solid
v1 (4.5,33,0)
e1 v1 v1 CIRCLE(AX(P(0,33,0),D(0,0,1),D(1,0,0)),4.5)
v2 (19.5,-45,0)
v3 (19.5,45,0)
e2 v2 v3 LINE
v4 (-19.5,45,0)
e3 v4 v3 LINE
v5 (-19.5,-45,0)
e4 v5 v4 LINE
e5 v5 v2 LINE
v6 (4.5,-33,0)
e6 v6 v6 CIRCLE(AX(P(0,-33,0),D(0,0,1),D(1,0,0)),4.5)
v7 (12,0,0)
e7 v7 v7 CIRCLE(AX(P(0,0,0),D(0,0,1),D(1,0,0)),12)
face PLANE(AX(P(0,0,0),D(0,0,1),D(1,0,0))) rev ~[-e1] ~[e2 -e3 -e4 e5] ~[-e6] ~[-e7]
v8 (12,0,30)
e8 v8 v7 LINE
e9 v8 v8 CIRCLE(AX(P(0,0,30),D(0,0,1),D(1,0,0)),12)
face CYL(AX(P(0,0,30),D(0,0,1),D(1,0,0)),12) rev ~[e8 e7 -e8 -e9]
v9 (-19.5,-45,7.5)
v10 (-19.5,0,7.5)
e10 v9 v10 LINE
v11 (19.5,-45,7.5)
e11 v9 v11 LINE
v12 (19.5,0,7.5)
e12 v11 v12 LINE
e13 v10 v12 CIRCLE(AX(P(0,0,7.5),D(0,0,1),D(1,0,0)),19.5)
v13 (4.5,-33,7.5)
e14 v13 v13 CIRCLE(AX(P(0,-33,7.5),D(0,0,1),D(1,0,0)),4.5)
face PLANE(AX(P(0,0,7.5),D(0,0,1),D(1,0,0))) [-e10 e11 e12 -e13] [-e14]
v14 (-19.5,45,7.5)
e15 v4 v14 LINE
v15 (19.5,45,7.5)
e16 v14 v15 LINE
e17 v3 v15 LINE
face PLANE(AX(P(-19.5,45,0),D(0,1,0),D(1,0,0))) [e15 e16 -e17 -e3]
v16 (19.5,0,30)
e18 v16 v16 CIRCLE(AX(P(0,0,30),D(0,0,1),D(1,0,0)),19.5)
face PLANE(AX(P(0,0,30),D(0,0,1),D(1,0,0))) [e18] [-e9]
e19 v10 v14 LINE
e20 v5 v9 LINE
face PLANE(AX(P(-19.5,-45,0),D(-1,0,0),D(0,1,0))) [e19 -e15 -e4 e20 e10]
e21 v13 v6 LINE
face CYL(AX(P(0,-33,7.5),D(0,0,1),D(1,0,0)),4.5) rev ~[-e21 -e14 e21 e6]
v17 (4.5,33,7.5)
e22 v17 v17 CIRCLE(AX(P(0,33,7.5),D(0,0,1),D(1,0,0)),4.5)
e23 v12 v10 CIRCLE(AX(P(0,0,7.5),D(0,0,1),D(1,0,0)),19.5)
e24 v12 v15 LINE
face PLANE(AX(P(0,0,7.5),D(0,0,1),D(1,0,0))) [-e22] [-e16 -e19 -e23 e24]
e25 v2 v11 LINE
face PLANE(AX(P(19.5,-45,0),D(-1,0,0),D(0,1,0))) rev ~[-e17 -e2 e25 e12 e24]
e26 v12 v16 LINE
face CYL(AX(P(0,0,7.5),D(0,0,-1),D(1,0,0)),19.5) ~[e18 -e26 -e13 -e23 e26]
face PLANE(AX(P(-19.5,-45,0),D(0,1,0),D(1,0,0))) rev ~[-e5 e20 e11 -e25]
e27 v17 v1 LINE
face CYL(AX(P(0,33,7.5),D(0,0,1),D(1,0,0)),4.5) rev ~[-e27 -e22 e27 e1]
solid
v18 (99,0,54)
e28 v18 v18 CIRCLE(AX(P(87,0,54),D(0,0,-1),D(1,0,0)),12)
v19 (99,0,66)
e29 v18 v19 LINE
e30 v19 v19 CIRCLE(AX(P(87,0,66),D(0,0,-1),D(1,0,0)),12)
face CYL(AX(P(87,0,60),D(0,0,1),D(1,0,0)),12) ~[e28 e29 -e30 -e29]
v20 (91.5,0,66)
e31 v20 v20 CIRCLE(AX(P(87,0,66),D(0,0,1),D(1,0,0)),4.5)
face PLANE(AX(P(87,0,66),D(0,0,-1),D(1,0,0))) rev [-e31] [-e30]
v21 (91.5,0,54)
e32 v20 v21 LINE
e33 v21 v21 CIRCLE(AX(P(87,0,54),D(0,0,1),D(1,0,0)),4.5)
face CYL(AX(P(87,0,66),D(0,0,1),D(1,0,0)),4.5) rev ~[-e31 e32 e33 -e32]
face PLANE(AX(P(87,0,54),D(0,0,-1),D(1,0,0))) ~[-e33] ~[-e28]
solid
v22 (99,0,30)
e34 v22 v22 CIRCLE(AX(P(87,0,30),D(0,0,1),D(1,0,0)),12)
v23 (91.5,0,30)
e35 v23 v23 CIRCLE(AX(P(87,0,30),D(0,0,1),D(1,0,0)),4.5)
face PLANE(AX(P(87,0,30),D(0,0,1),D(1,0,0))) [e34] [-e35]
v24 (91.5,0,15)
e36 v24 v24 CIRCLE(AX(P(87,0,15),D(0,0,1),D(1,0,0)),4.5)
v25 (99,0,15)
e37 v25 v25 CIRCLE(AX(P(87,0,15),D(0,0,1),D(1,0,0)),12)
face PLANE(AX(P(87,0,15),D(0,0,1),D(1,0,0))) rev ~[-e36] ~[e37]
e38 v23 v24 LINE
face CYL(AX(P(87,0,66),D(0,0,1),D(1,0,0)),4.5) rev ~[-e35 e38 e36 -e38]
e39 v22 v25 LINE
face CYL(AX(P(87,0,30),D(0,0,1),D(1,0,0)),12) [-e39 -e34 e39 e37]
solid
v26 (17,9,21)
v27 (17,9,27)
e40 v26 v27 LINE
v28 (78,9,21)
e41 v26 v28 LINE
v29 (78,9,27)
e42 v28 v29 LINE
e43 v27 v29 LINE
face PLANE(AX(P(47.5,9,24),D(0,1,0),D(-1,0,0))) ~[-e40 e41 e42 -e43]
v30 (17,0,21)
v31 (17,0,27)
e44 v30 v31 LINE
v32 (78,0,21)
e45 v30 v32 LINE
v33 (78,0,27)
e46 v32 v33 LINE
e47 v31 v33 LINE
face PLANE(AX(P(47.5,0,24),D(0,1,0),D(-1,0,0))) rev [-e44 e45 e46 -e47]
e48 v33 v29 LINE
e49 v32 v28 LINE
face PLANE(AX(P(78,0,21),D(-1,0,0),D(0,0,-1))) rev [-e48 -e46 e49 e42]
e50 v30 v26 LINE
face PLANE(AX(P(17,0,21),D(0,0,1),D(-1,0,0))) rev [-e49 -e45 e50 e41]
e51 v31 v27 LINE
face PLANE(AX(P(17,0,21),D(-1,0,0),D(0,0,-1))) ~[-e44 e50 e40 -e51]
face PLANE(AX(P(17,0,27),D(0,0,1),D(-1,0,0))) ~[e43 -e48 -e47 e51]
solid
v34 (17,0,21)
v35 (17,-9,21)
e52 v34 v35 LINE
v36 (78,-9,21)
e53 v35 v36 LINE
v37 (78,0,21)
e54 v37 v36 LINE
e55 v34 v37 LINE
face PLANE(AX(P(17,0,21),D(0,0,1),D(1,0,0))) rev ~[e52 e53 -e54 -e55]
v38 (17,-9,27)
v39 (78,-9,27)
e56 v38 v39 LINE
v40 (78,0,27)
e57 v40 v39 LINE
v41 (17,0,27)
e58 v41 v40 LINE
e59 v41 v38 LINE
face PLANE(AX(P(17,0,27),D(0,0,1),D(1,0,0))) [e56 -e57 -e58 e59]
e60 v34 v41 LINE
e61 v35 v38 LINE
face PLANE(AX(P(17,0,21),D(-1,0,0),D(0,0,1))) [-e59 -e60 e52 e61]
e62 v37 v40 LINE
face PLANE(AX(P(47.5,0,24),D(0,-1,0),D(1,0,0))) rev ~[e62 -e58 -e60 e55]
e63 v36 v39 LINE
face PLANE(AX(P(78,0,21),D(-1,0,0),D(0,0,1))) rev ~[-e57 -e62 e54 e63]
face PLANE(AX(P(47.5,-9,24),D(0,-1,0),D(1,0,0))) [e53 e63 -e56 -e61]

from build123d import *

# Parameters (mm, degrees)
F0_W      = 39
F0_H      = 90
F1_DEPTH  = 7.5
F3_R      = 4.5
F4_DEPTH  = 7.5
F5_DEPTH  = 22.5
F6_R      = 12
F7_DEPTH  = 30
F8_R      = 12
F9_DEPTH  = 15
F10_W     = 12
F10_H     = 12
F12_R     = 4.5
F13_DEPTH = 51
F14_R     = 4.5
F15_DEPTH = 15
F16_W     = 61
F16_H     = 6
F17_DEPTH = 9


with BuildPart() as f1:
    # F0 (on Top) → F1 (new body)
    with BuildSketch(Plane.XY):
        Rectangle(F0_W, F0_H)
    extrude(amount=F1_DEPTH)

    # F3 (on face) → F4 (cut, through all)
    with BuildSketch(Plane.XY.offset(7.5)):
        with Locations((0, -33)):
            Circle(F3_R)
        with Locations((0, 33)):
            Circle(F3_R)
    extrude(amount=-F4_DEPTH, mode=Mode.SUBTRACT)

    # F2 (on face) → F5 (join)
    with BuildSketch(Plane.XY.offset(7.5)):
        with BuildLine():
            ThreePointArc((-19.5, -2.3e-08), (1.15e-08, -19.5), (19.5, 0))
            ThreePointArc((19.5, 0), (-1.15e-08, 19.5), (-19.5, -2.3e-08))
        make_face()
    extrude(amount=F5_DEPTH)

    # F6 (on face) → F7 (cut, through all)
    with BuildSketch(Plane.XY.offset(30)):
        Circle(F6_R)
    extrude(amount=-F7_DEPTH, mode=Mode.SUBTRACT)

    # F14 (on face) → F15 (cut, through all)
    with BuildSketch(Plane.XY.offset(30)):
        with Locations((87, 0)):
            Circle(F14_R)
    extrude(amount=-F15_DEPTH, mode=Mode.SUBTRACT)


with BuildPart() as f9:
    # F8 (on face) → F9 (new body)
    with BuildSketch(Plane.XY.offset(30)):
        with Locations((87, 0)):
            Circle(F8_R)
    extrude(amount=-F9_DEPTH)


with BuildPart() as f11:
    # F10 (on Front) → F11 (revolve)
    with BuildSketch(Plane.XZ):
        with Locations((93, 60)):
            Rectangle(F10_W, F10_H)
    revolve(axis=Axis((87, 0, 60), (0, 0, -1)))


with BuildPart() as f13_tool:
    # F12 (on face) → F13 (new body, through all)
    with BuildSketch(Plane.XY.offset(66)):
        with Locations((87, 0)):
            Circle(F12_R)
    extrude(amount=-F13_DEPTH)


with BuildPart() as f9_1:
    add(f9.part)

    # F13: cut by f13_tool
    add(f13_tool.part, mode=Mode.SUBTRACT)


with BuildPart() as f11_1:
    add(f11.part)

    # F13: cut by f13_tool
    add(f13_tool.part, mode=Mode.SUBTRACT)


with BuildPart() as f17:
    # F16 (on Front) → F17 (new body)
    with BuildSketch(Plane.XZ):
        with Locations((47.5, 24)):
            Rectangle(F16_W, F16_H)
    extrude(amount=F17_DEPTH)


with BuildPart() as f18_1:
    # F18: instance of F17
    add(f17.part.mirror(Plane.XZ))


solid = Compound([f1.part, f9_1.part, f11_1.part, f17.part, f18_1.part])
